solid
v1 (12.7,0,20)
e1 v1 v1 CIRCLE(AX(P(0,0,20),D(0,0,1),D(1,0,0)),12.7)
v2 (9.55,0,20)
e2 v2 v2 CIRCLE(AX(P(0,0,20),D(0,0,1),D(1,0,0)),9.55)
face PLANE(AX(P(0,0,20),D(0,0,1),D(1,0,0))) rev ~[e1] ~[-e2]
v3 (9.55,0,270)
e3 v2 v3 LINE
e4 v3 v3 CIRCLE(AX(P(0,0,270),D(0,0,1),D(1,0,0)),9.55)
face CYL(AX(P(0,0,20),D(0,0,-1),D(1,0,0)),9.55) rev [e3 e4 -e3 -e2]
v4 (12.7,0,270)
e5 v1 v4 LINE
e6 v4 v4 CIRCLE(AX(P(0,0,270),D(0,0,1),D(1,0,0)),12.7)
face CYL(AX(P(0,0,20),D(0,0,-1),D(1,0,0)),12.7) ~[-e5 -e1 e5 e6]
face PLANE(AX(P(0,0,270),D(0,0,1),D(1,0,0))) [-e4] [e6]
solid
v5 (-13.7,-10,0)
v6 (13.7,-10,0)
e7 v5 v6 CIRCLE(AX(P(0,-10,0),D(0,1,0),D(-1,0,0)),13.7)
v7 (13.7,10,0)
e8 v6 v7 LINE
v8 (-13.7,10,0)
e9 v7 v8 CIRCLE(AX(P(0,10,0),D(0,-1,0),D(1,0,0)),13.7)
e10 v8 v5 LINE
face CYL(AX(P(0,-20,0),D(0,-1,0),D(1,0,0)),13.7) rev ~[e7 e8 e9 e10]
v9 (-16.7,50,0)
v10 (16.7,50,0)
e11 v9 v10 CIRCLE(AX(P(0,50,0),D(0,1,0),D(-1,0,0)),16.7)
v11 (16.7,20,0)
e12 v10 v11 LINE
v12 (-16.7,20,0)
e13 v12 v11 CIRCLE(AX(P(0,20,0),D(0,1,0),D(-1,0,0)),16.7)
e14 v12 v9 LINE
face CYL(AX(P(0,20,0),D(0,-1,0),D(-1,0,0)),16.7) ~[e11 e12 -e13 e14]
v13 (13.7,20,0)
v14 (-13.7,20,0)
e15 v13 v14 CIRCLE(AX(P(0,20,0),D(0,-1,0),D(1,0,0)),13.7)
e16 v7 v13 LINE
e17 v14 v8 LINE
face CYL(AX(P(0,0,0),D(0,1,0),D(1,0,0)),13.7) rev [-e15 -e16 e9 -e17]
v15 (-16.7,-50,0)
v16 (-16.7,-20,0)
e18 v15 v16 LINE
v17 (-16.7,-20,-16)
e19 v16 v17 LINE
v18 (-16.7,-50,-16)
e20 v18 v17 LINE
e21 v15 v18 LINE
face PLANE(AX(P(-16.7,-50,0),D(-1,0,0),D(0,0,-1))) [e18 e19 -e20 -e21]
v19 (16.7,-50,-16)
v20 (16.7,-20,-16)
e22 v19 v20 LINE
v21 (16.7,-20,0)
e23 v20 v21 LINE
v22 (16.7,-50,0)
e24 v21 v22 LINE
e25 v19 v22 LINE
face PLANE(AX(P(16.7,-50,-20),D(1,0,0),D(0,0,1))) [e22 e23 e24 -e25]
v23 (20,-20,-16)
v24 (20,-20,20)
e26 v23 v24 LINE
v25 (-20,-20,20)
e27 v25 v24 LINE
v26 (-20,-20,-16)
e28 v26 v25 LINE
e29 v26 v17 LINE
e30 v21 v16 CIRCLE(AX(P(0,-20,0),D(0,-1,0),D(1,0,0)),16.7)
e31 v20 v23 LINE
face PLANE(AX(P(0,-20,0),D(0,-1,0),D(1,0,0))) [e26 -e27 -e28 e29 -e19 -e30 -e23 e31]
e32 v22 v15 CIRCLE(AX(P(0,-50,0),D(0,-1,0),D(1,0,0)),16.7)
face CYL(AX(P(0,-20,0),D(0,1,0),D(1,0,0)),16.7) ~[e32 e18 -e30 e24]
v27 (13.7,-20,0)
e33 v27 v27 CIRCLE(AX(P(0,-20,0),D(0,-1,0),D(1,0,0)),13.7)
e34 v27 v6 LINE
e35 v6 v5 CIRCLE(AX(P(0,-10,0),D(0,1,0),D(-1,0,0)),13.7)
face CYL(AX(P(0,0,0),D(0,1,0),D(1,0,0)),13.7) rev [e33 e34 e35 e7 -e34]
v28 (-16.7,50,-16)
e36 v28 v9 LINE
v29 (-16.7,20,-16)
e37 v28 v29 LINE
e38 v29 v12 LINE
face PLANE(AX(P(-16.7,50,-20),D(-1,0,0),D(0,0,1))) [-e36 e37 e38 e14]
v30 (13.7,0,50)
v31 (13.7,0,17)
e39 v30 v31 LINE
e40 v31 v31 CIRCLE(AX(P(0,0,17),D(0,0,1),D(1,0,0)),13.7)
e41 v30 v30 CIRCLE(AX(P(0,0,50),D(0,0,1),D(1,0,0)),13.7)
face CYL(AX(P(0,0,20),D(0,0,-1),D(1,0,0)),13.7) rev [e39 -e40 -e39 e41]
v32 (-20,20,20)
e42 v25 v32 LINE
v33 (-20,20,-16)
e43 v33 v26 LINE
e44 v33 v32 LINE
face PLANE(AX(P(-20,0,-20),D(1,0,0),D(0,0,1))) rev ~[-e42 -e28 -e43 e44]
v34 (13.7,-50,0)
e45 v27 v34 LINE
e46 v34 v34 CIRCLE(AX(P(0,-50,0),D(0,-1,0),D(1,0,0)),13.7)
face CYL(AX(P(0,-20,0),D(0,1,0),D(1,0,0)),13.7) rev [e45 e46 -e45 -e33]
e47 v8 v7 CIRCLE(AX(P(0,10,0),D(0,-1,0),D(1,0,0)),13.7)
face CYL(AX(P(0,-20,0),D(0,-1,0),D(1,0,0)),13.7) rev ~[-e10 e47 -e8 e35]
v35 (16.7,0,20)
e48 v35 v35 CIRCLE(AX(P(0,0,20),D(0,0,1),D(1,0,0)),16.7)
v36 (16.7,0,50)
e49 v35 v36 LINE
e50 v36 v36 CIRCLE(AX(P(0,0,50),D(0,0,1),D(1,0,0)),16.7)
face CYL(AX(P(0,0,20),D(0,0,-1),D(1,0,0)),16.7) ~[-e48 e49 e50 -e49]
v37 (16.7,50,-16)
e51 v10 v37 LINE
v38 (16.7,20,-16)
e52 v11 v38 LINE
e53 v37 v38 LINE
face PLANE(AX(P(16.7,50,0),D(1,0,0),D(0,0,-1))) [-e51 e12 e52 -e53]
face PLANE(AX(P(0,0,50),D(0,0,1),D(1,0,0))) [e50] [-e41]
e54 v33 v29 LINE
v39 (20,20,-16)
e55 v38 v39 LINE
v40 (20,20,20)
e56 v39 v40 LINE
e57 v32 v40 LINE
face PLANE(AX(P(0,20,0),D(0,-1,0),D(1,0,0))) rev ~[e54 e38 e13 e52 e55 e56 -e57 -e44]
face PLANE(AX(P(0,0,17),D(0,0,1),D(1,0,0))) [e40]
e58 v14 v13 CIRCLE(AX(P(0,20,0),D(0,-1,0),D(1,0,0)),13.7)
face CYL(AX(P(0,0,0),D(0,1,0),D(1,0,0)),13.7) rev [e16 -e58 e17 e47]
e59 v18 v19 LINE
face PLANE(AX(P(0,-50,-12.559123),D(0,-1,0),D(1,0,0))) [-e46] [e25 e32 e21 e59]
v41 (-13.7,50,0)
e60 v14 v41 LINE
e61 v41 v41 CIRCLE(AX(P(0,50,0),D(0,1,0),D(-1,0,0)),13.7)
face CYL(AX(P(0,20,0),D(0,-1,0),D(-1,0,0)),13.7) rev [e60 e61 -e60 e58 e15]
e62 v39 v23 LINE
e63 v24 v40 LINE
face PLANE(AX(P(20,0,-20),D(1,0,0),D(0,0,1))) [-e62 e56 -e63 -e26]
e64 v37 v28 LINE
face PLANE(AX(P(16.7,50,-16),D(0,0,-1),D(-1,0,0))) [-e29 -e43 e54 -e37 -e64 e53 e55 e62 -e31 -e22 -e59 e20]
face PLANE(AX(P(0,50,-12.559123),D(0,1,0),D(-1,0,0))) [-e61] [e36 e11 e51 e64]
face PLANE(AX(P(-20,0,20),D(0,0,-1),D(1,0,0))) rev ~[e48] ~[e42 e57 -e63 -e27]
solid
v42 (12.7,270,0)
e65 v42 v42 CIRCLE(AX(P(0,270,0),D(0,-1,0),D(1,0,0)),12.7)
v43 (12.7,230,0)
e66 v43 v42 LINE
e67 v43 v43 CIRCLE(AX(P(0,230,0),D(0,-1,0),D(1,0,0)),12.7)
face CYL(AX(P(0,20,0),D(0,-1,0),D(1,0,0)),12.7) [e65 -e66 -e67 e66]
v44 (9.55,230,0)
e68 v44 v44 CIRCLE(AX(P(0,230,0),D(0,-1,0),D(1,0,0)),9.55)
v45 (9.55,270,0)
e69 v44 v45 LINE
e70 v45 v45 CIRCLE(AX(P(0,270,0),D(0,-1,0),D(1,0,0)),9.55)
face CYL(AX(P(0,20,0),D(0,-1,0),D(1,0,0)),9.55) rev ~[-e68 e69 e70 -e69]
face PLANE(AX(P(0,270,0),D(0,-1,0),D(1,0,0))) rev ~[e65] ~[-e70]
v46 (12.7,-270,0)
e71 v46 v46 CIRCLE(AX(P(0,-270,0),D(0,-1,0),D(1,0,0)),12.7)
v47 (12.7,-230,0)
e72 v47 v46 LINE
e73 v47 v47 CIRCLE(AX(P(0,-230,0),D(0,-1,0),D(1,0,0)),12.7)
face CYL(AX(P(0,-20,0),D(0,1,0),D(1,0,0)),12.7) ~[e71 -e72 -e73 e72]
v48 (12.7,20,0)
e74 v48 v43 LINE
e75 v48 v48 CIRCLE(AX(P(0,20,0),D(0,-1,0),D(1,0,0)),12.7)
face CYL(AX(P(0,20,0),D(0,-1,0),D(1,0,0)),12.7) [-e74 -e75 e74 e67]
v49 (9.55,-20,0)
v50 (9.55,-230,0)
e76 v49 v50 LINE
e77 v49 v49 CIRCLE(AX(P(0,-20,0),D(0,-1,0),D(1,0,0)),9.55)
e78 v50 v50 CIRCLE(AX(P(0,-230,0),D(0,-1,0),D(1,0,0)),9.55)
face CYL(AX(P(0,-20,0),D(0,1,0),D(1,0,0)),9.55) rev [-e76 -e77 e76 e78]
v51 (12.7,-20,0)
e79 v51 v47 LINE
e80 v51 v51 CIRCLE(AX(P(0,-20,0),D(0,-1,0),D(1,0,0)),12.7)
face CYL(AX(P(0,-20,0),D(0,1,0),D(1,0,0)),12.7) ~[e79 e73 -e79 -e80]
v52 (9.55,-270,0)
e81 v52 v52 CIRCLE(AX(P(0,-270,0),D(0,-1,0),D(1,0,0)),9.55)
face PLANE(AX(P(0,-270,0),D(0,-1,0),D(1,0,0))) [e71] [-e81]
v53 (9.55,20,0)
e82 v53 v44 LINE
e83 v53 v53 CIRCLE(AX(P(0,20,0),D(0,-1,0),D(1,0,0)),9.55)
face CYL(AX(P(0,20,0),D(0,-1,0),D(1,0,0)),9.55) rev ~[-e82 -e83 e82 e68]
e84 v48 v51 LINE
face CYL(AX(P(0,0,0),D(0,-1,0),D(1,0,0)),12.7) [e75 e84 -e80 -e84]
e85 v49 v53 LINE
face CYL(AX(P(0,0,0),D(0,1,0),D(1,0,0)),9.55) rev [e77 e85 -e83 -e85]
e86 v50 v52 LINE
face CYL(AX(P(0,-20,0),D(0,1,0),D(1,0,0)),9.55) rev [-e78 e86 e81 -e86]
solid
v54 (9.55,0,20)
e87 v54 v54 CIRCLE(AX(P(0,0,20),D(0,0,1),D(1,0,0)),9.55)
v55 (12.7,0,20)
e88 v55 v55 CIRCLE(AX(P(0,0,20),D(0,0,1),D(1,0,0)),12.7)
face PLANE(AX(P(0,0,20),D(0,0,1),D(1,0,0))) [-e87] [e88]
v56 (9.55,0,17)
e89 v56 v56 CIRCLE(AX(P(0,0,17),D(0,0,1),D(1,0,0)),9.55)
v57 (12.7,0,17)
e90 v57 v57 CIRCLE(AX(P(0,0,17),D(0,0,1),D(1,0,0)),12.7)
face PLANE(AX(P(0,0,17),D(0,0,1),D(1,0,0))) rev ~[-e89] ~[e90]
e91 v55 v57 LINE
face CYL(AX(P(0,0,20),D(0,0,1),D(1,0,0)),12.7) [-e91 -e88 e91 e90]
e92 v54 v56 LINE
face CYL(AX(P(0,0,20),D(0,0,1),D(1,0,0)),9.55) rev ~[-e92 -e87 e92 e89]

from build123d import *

# Parameters (mm, degrees)
F0_W      = 40
F0_H      = 40
F0_R      = 16.7
F0_R_2    = 13.7
F1_DEPTH  = 20
F0_R_3    = 12.7
F0_R_4    = 9.55
F2_R      = 16.7
F2_R_2    = 13.7
F3_R      = 16.7
F3_R_2    = 13.7
F4_DEPTH  = 30
F5_DEPTH  = 250
F6_R      = 13.7
F6_R_2    = 12.7
F6_R_3    = 9.55
F7_DEPTH  = 3
F8_DEPTH  = 250
F6_R_4    = 16.7
F9_DEPTH  = 30
F10_DEPTH = 3
F13_DEPTH = 30
F14_DEPTH = 30
F15_DEPTH = 4


# Not quite as in the source:
# - after a boolean that leaves OpenCascade's solid faulty, fix() repairs it


with BuildPart() as f1:
    # F0 (on Front) → F1 (new body, symmetric)
    with BuildSketch(Plane.XZ):
        Rectangle(F0_W, F0_H)
        Circle(F0_R, mode=Mode.SUBTRACT)
        Circle(F0_R)
        Circle(F0_R_2, mode=Mode.SUBTRACT)
    extrude(amount=F1_DEPTH, both=True)

    # F2 (on face) + F3 (on face) → F4 (join, symmetric)
    with BuildSketch(Plane.XZ.offset(20)):
        Circle(F2_R)
        Circle(F2_R_2, mode=Mode.SUBTRACT)
    with BuildSketch(Plane(origin=(0, 20, 0), x_dir=(-1, 0, 0), z_dir=(0, 1, 0))):
        Circle(F3_R)
        Circle(F3_R_2, mode=Mode.SUBTRACT)
    extrude(amount=F4_DEPTH, both=True, dir=(0, -1, 0))

    add(f1.part.fix(), mode=Mode.REPLACE)

    # F6 (on face) → F7 (cut)
    with BuildSketch(Plane.XY.offset(20)):
        Circle(F6_R)
        Circle(F6_R_2, mode=Mode.SUBTRACT)
        Circle(F6_R_2)
        Circle(F6_R_3, mode=Mode.SUBTRACT)
        Circle(F6_R_3)
    extrude(amount=-F7_DEPTH, mode=Mode.SUBTRACT)

    # F6 (on face) → F9 (join)
    with BuildSketch(Plane.XY.offset(20)):
        Circle(F6_R_4)
        Circle(F6_R, mode=Mode.SUBTRACT)
    extrude(amount=F9_DEPTH)

    # F11 (on face) → F13 (join, through all)
    with BuildSketch(Plane.XZ.offset(50)):
        with BuildLine():
            ThreePointArc((16.7, 0), (0, -16.7), (-16.7, 0))
            Line((-16.7, 0), (-16.7, -20))
            Line((-16.7, -20), (16.7, -20))
            Line((16.7, -20), (16.7, 0))
        make_face()
    extrude(amount=-F13_DEPTH)

    # F12 (on face) → F14 (join, through all)
    with BuildSketch(Plane(origin=(0, 50, 0), x_dir=(-1, 0, 0), z_dir=(0, 1, 0))):
        with BuildLine():
            ThreePointArc((16.7, 0), (0, -16.7), (-16.7, 0))
            Line((-16.7, 0), (-16.7, -20))
            Line((-16.7, -20), (16.7, -20))
            Line((16.7, -20), (16.7, 0))
        make_face()
    extrude(amount=-F14_DEPTH)

    # F15 (cut): a face of the model
    f15_faces = [f1.faces().sort_by_distance(p)[0] for p in [
        (0, 0, -20),
    ]]
    extrude(f15_faces, amount=-F15_DEPTH, mode=Mode.SUBTRACT)


with BuildPart() as f1b:
    # F0 (on Front) → F1, piece 2 (new body, symmetric)
    with BuildSketch(Plane.XZ):
        Circle(F0_R_3)
        Circle(F0_R_4, mode=Mode.SUBTRACT)
    extrude(amount=F1_DEPTH, both=True)

    # F5 (add, symmetric): faces of the model
    f5_faces = [f1b.faces().sort_by_distance(p)[0] for p in [
        (-12.3407897552, -20, 0),
        (-12.3407897552, 20, 0),
    ]]
    extrude(f5_faces, amount=F5_DEPTH, both=True, dir=(0, -1, 0))


with BuildPart() as f8:
    # F6 (on face) → F8 (new body)
    with BuildSketch(Plane.XY.offset(20)):
        Circle(F6_R_2)
        Circle(F6_R_3, mode=Mode.SUBTRACT)
    extrude(amount=F8_DEPTH)


with BuildPart() as f10:
    # F6 (on face) → F10 (new body)
    with BuildSketch(Plane.XY.offset(20)):
        Circle(F6_R_2)
        Circle(F6_R_3, mode=Mode.SUBTRACT)
    extrude(amount=-F10_DEPTH)


solid = Compound([f1.part, f1b.part, f8.part, f10.part])
